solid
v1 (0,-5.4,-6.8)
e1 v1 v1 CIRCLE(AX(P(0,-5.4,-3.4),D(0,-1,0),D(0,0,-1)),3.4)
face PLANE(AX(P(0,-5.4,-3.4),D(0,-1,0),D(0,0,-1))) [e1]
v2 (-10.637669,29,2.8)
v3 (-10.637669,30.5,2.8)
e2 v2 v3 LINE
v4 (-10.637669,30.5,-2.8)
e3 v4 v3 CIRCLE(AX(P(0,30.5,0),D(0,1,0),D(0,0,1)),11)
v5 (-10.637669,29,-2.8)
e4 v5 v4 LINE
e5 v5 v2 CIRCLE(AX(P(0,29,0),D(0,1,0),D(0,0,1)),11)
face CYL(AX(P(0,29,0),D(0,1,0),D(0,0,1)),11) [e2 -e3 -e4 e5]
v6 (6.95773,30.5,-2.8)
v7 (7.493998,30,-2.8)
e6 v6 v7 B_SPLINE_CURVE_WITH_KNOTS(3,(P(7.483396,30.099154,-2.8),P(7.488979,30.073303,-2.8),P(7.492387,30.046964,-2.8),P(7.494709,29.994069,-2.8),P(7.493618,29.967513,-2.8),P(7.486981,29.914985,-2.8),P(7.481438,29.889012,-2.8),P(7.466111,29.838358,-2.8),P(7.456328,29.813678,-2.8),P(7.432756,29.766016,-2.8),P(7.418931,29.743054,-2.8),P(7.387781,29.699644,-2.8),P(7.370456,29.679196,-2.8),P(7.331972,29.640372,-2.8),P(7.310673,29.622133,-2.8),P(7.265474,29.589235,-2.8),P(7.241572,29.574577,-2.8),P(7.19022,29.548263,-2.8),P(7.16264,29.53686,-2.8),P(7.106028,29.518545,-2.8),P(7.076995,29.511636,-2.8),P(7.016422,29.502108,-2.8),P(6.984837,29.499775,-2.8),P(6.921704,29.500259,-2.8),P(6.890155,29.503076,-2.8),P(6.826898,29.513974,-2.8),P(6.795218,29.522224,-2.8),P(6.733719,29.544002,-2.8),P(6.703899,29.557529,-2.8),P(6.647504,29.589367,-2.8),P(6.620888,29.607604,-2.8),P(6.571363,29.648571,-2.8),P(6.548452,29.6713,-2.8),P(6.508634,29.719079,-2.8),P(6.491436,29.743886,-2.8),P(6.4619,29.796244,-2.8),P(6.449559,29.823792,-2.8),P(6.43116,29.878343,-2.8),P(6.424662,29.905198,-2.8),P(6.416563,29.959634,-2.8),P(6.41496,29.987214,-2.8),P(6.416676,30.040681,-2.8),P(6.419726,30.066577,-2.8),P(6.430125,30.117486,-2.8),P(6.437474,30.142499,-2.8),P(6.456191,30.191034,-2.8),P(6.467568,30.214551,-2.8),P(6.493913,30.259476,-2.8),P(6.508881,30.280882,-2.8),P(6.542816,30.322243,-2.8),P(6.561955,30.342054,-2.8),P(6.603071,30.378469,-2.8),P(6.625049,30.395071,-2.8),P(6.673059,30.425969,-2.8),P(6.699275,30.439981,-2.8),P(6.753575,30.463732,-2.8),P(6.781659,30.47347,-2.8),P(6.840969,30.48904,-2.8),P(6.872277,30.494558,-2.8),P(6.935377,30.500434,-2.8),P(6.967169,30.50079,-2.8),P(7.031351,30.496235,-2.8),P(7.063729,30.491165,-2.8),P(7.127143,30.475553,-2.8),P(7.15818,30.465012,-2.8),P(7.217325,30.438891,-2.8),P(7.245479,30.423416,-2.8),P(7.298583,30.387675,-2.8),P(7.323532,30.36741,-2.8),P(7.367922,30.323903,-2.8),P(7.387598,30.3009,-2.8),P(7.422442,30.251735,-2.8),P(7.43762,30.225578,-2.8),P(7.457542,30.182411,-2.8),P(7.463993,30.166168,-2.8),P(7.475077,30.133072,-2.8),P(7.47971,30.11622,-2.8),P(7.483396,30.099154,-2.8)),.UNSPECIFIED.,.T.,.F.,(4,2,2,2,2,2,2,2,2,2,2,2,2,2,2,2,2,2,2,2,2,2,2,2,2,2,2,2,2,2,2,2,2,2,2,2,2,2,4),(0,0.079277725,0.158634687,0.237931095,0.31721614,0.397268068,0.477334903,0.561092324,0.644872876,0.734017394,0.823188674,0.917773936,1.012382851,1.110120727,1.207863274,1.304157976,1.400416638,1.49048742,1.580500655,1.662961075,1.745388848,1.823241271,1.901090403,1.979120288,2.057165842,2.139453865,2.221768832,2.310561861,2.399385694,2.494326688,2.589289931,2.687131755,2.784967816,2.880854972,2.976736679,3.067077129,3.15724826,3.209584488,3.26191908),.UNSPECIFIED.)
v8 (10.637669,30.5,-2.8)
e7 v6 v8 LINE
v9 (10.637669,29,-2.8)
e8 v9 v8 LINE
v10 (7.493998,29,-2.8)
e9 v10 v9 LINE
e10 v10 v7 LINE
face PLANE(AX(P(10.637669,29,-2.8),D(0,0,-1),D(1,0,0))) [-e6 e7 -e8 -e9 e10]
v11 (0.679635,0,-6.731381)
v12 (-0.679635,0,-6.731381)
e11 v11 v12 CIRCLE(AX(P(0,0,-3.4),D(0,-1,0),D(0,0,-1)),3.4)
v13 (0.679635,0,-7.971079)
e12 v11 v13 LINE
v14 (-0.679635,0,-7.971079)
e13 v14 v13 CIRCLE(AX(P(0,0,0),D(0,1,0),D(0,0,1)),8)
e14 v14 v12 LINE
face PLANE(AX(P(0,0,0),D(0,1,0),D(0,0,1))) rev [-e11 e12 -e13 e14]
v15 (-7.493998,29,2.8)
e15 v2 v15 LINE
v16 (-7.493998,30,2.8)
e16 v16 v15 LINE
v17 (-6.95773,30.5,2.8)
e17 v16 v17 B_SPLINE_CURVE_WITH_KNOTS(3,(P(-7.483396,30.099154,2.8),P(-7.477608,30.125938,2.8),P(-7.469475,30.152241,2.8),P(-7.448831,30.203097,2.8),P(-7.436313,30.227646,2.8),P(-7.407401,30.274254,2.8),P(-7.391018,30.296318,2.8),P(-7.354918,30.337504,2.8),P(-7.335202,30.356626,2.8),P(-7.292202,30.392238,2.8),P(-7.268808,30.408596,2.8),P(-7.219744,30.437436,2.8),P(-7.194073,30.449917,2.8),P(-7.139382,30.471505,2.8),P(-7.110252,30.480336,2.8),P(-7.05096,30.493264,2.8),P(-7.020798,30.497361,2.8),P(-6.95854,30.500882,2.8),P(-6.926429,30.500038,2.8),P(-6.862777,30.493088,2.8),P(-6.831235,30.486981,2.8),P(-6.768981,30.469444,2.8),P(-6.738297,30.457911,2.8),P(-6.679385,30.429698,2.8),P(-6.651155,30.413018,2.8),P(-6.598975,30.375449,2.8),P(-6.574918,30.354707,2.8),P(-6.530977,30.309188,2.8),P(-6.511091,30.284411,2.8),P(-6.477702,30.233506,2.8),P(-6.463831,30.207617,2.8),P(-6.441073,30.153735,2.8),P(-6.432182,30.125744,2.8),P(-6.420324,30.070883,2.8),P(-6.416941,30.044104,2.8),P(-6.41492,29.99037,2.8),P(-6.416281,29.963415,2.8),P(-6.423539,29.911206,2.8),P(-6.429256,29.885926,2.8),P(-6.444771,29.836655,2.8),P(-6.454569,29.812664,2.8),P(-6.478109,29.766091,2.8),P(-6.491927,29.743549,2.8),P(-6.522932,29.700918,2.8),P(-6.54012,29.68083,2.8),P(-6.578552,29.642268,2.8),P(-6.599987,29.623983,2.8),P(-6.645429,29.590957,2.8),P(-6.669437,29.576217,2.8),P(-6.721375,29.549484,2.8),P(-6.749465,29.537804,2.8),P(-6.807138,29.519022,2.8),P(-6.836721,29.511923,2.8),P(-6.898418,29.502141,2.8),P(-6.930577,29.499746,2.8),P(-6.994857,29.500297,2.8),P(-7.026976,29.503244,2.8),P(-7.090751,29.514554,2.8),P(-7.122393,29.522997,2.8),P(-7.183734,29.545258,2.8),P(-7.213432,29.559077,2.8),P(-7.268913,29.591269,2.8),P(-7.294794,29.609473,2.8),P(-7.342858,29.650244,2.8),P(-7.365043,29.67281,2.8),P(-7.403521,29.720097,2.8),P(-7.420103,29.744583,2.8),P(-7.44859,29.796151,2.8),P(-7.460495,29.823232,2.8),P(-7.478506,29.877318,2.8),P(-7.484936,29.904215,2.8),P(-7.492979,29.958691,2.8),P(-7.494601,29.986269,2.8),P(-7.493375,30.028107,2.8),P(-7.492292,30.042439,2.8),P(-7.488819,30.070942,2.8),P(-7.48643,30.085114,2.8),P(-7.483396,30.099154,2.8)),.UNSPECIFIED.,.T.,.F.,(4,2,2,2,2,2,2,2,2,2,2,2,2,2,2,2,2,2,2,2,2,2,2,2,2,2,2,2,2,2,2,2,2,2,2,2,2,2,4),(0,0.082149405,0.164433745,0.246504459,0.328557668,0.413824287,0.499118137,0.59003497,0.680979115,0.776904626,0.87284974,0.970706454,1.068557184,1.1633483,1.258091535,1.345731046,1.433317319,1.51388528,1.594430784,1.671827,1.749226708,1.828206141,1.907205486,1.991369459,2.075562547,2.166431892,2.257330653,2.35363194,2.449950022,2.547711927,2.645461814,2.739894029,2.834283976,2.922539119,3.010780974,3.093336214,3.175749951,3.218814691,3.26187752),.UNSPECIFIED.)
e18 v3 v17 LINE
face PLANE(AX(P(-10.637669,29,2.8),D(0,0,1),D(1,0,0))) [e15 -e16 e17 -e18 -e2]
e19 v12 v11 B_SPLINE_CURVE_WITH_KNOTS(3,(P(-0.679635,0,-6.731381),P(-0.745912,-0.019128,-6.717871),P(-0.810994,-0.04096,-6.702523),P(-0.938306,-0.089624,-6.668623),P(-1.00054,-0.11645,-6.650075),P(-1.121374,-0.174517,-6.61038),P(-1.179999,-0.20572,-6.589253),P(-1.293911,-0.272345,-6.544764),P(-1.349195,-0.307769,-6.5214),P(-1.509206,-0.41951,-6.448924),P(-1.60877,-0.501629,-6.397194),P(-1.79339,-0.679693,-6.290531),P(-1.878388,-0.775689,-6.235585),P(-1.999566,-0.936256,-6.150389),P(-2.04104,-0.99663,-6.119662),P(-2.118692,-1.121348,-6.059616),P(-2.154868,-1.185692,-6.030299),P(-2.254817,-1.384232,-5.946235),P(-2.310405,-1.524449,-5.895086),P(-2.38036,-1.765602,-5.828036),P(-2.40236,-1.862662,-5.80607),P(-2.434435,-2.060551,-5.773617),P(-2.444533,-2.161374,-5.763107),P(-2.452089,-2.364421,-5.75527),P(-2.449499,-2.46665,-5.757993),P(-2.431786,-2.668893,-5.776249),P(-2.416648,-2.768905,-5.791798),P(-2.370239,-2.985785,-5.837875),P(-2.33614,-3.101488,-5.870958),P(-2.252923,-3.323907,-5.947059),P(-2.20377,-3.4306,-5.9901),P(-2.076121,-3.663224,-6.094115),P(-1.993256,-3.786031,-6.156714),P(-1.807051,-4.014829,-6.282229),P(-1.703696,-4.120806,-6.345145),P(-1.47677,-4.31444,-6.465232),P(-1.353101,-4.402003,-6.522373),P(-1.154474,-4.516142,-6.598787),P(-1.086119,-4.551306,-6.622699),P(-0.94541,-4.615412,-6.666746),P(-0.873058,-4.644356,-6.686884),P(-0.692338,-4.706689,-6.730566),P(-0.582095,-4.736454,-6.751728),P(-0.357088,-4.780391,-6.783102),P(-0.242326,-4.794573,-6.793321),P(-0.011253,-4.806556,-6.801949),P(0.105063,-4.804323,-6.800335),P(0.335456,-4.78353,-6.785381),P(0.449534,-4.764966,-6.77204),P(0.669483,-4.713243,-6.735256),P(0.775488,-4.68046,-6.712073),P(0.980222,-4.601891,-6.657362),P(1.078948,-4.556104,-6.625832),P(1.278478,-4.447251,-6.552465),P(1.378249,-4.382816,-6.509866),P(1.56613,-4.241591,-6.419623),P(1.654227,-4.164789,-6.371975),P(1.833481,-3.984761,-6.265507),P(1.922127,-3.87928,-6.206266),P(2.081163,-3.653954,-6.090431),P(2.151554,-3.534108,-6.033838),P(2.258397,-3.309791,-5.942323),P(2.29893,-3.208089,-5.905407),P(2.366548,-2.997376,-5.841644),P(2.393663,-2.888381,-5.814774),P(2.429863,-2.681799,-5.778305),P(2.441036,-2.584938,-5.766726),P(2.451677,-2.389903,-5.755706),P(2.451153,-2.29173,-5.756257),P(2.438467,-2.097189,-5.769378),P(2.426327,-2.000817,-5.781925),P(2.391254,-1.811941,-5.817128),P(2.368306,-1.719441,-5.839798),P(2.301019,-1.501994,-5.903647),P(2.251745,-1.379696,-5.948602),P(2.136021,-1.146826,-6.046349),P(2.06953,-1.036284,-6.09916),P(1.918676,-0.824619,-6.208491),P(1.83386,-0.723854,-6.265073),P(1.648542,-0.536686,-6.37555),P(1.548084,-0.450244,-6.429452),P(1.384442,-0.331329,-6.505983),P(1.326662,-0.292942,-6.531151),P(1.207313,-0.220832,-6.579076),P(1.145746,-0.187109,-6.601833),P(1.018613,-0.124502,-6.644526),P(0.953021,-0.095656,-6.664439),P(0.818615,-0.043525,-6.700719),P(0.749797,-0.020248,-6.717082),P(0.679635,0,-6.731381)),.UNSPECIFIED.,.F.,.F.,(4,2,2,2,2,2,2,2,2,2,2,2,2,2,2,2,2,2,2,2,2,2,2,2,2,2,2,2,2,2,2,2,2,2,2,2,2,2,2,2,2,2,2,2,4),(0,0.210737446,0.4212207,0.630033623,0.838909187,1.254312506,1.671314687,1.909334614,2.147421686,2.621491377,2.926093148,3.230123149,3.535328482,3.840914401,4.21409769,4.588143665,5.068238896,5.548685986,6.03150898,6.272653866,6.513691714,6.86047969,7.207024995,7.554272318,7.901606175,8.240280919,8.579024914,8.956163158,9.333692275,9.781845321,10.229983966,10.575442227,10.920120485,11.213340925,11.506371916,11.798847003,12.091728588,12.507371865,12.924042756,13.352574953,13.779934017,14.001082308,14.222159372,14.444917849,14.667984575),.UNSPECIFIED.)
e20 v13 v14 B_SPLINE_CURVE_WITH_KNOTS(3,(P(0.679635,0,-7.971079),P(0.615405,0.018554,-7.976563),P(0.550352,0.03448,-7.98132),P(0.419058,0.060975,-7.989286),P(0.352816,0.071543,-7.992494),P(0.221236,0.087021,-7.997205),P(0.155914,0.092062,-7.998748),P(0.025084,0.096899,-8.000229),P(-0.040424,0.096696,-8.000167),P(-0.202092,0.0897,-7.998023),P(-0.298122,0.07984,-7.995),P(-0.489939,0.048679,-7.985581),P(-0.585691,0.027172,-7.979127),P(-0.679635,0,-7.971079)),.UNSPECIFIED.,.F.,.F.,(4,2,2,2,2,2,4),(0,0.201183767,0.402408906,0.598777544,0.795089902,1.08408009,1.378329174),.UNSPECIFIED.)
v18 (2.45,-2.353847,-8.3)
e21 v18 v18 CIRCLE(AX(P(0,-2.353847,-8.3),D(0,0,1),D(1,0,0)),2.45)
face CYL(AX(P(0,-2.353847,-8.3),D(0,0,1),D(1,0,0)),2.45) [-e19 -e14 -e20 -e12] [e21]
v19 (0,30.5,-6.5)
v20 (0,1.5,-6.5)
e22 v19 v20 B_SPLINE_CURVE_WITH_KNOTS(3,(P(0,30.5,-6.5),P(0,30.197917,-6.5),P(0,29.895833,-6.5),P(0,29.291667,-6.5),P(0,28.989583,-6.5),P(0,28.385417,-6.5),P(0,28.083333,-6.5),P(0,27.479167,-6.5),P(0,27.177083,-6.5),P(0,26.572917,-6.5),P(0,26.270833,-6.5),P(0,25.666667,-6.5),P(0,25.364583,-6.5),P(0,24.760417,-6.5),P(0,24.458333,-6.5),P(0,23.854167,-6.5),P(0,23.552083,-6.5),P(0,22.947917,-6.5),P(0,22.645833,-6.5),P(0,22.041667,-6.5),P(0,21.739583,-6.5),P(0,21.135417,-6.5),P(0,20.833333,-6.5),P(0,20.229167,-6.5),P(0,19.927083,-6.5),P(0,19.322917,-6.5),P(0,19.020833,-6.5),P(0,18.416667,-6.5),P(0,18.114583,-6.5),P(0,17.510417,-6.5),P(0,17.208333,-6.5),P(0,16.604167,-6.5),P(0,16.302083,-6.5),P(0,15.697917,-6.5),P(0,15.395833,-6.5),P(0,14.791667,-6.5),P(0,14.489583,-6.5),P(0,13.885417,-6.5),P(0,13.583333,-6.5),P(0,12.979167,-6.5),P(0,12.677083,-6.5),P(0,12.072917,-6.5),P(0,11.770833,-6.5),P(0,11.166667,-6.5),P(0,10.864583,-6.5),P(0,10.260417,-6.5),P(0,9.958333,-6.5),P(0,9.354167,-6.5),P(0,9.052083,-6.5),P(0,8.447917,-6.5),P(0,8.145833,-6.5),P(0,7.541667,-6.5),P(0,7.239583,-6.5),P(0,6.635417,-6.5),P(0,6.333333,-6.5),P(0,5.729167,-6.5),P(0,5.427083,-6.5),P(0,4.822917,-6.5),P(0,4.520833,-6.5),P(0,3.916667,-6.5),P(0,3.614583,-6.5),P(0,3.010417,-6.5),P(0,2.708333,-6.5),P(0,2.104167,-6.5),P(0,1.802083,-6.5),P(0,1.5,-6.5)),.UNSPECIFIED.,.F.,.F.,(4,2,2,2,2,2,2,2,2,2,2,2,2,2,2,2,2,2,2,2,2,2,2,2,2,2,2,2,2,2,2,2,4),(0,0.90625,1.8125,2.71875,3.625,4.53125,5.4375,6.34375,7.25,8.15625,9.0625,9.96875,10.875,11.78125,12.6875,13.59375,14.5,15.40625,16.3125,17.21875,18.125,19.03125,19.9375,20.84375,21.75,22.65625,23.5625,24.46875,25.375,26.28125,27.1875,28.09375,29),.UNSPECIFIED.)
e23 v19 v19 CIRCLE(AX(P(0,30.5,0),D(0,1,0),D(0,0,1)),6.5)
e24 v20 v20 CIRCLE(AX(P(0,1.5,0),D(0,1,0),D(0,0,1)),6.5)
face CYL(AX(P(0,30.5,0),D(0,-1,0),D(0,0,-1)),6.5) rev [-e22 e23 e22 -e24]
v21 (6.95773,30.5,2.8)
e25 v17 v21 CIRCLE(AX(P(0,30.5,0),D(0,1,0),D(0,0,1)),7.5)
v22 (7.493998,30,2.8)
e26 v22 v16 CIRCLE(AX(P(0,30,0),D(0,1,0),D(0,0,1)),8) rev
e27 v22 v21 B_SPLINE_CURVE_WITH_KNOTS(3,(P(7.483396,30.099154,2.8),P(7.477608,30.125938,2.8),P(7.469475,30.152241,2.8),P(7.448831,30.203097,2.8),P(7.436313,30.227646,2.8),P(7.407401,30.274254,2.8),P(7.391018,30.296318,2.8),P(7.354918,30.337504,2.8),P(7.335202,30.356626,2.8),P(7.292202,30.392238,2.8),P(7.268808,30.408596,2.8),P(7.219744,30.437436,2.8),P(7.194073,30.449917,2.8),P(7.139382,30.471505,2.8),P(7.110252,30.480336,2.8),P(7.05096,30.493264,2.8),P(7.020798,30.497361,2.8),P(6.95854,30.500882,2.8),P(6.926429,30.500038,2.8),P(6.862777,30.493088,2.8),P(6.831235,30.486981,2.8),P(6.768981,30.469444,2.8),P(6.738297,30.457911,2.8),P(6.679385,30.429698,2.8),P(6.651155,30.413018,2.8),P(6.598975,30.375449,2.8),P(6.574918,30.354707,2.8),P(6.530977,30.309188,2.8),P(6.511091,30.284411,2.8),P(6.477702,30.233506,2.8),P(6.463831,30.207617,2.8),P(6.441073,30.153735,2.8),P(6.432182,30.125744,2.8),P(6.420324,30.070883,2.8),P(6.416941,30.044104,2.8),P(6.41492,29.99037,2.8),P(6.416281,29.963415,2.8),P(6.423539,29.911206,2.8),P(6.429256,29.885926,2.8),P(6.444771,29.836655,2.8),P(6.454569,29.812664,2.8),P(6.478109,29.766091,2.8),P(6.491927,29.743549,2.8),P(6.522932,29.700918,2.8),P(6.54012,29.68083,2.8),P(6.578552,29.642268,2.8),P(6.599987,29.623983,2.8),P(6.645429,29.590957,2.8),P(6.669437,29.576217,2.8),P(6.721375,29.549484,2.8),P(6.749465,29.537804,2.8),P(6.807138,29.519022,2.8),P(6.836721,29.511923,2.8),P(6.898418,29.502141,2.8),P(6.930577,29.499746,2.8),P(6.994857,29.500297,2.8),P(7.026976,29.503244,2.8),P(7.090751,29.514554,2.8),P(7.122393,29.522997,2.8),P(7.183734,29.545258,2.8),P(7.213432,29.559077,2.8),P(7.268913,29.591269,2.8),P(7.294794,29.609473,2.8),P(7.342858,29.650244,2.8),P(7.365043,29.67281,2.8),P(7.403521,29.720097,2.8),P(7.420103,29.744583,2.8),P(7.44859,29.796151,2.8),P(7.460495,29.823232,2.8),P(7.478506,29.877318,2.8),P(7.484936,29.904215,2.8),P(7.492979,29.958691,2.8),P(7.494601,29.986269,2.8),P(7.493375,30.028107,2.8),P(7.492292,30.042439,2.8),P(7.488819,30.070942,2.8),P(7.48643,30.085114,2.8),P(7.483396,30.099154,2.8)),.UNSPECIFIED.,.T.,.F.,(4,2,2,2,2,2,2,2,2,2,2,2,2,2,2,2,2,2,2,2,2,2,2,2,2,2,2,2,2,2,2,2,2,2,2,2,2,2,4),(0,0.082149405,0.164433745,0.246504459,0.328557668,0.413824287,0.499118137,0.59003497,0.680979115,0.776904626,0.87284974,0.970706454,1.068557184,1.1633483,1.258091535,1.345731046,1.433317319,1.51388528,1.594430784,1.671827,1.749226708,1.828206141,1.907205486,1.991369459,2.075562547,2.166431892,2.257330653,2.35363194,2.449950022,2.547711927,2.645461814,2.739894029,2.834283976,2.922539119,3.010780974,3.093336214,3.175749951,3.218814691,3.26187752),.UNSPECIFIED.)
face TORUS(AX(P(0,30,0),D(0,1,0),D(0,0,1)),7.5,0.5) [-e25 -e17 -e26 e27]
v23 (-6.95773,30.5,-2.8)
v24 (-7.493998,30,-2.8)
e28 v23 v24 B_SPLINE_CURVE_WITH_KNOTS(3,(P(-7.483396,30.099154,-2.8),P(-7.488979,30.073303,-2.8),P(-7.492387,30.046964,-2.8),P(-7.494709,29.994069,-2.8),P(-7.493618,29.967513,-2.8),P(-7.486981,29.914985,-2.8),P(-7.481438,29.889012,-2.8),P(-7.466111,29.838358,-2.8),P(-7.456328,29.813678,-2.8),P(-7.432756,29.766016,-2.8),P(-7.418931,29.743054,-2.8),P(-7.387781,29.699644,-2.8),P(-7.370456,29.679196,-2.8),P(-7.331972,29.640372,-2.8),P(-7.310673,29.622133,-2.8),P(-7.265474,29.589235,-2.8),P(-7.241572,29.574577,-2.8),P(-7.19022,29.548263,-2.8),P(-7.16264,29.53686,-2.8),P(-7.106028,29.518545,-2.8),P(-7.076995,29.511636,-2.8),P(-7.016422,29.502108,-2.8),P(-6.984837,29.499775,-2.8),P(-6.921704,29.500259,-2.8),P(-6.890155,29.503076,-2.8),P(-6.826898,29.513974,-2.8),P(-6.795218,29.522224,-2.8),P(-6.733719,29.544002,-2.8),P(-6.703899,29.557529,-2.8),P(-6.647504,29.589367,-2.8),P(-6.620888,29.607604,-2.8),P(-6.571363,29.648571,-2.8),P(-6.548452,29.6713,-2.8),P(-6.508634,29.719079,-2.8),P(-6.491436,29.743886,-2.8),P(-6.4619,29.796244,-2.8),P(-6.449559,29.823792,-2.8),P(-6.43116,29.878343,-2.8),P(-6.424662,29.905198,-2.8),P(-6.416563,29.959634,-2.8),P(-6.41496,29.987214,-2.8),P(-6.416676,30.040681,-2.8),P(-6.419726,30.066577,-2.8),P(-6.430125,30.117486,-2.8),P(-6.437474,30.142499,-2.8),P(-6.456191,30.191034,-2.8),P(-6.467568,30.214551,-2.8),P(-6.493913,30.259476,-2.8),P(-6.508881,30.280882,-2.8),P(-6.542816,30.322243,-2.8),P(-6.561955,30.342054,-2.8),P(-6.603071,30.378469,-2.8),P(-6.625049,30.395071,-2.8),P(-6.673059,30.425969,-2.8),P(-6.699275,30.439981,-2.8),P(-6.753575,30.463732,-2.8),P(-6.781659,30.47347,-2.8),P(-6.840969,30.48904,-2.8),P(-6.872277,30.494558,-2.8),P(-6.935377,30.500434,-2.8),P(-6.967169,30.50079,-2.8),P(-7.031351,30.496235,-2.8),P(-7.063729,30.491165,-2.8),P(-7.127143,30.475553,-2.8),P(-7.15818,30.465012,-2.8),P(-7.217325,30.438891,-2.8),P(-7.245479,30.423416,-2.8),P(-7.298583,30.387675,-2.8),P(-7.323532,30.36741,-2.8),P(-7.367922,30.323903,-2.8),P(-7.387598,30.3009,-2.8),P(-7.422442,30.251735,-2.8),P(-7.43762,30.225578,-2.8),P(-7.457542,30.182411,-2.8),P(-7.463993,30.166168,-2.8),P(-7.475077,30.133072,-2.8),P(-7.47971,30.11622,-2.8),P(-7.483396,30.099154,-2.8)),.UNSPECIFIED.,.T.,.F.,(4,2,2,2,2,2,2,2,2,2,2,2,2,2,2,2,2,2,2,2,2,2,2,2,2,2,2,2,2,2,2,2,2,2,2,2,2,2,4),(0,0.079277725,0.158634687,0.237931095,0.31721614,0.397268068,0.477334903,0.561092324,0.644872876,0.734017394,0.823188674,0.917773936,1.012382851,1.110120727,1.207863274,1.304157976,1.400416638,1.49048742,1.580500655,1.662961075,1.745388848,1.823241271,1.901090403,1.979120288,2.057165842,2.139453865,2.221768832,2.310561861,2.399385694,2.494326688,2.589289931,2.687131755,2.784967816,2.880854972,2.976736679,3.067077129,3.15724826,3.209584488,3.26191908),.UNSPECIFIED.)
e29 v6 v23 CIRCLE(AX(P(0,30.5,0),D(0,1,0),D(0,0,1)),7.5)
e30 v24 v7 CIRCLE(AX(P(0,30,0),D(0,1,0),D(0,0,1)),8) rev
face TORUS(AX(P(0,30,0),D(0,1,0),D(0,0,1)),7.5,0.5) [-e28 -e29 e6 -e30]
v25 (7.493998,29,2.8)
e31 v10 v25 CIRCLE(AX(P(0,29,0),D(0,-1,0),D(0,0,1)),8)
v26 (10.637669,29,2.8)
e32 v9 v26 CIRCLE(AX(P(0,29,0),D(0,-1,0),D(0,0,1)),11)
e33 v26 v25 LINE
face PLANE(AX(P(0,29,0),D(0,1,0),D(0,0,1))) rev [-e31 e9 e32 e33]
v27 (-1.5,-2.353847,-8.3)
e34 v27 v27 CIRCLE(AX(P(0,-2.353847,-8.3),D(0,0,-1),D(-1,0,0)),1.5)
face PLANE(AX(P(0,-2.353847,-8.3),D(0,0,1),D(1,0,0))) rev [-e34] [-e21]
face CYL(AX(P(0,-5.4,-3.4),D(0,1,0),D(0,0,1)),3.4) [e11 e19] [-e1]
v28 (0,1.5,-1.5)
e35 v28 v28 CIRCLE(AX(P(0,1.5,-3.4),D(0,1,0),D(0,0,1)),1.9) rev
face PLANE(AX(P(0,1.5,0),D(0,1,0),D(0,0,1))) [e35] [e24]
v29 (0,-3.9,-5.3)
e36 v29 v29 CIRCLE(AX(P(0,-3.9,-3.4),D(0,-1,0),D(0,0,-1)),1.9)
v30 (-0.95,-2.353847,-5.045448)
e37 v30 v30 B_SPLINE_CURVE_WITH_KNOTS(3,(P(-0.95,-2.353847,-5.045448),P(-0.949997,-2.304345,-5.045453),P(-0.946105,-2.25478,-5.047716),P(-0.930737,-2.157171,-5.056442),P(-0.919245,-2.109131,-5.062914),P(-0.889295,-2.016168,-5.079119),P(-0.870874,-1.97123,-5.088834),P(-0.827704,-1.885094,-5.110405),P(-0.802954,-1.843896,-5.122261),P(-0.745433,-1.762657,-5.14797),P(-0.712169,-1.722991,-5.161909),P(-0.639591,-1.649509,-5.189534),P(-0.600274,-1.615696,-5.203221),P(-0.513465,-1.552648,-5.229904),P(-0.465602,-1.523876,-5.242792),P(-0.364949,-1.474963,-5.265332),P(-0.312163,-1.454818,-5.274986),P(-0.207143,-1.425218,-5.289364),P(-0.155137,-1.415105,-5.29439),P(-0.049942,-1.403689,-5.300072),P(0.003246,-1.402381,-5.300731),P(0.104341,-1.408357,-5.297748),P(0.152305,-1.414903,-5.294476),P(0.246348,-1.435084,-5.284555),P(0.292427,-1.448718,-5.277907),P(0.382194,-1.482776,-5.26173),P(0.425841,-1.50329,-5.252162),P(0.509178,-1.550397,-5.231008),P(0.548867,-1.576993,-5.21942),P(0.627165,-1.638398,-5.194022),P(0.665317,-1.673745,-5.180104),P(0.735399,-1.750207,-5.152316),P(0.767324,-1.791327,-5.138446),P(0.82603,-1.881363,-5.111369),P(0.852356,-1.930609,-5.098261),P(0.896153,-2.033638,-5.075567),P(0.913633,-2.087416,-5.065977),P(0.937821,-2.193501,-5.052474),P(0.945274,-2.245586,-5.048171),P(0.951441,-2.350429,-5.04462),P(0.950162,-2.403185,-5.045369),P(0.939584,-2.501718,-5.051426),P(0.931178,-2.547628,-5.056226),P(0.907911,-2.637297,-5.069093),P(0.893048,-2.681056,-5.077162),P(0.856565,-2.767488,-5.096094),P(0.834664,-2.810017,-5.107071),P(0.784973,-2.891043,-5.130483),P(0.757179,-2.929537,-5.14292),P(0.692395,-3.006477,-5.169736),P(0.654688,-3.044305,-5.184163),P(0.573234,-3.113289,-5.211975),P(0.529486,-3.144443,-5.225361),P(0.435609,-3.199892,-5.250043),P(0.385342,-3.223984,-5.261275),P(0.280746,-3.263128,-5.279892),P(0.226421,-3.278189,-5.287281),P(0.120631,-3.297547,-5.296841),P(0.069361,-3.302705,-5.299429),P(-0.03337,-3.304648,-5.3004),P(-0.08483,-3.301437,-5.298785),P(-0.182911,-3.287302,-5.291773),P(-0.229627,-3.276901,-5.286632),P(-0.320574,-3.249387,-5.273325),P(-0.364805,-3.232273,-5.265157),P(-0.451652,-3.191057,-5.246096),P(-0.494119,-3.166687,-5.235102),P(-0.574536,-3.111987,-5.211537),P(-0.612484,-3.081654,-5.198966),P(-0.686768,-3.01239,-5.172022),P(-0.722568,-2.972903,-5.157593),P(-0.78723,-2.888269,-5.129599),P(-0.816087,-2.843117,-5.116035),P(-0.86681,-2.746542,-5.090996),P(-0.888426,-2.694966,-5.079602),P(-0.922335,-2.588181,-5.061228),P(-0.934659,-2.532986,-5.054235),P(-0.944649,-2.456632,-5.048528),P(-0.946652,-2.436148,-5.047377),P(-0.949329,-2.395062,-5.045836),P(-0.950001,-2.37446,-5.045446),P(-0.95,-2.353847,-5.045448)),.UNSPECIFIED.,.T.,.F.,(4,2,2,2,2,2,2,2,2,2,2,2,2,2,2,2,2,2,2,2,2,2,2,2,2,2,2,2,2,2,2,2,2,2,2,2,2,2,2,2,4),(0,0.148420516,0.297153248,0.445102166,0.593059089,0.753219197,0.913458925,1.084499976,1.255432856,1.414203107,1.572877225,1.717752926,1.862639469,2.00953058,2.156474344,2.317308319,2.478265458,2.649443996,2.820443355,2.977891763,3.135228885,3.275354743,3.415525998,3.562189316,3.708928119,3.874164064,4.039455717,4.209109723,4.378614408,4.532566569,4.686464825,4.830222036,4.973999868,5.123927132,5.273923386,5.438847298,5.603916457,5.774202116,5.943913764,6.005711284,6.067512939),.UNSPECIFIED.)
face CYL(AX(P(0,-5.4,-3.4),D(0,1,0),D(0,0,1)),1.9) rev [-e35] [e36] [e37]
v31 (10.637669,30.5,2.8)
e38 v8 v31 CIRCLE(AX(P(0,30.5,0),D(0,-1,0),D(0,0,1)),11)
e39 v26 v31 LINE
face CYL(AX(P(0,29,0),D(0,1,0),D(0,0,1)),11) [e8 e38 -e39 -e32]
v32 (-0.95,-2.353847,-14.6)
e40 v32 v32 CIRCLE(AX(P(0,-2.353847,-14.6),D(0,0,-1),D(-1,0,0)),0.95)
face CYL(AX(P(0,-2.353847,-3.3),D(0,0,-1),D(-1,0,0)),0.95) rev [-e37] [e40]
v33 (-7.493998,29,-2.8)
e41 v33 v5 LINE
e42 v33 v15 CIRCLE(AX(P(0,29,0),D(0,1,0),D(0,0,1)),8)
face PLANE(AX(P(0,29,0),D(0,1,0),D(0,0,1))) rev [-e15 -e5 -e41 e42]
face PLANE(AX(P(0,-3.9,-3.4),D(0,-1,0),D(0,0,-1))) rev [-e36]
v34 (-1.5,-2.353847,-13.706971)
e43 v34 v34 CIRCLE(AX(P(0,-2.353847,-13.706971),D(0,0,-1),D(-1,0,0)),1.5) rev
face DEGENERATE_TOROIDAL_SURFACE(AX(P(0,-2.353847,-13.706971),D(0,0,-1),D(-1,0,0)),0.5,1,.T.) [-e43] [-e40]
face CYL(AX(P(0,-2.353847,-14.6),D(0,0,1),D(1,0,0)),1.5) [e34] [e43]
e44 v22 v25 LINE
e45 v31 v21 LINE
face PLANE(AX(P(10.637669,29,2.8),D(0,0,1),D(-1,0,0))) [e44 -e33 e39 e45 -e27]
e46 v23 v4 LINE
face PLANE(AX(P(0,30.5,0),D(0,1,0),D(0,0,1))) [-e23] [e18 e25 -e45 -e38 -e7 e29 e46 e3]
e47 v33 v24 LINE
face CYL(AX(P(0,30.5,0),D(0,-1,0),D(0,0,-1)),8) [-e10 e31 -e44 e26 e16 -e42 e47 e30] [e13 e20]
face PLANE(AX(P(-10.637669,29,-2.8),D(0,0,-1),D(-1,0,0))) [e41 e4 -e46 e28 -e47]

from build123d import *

# Parameters (mm, degrees)
SKETCH1_R           = 8
BOSS_EXTRUDE1_DEPTH = 30.5
SHELL1_T            = -1.5
SKETCH2_R           = 3.4
BOSS_EXTRUDE2_DEPTH = 5.4
SHELL2_START        = -3.9
SHELL2_OUTLINE_R    = 1.9
SHELL2_DEPTH        = 5.4
SKETCH5_R           = 2.45
BOSS_EXTRUDE5_DEPTH = 4.9
SKETCH6_R           = 1.5
BOSS_EXTRUDE6_DEPTH = 6.3
SKETCH7_R           = 0.95
CUT_EXTRUDE1_DEPTH  = 11.3
SKETCH8_R           = 1.9
CUT_EXTRUDE2_DEPTH  = 39.216750365
FILLET1_R           = 1
FILLET2_R           = 0.5
BOSS_EXTRUDE7_START = -1.5
BOSS_EXTRUDE7_DEPTH = 1.5


# Read off the part's stored shape, not the designer's step: Shell2
with BuildPart() as part:
    # Sketch1 → Boss-Extrude1 (new body)
    with BuildSketch(Plane(origin=(0, 0, 0), x_dir=(1, 0, 0), z_dir=(0, 1, 0))):
        with Locations(Location((0, 0, 0), (0, 0, 90))):
            Circle(SKETCH1_R)
    extrude(amount=BOSS_EXTRUDE1_DEPTH)

    # Shell1
    shell1_openings = [part.faces().sort_by_distance(p)[0] for p in [
        (0, 30.5, 0),
    ]]
    offset(amount=SHELL1_T, openings=shell1_openings, kind=Kind.INTERSECTION)

    # Sketch2 → Boss-Extrude2 (add)
    with BuildSketch(Plane.XZ):
        with Locations(Location((0, -3.4, 0), (0, 0, 90))):
            Circle(SKETCH2_R)
    extrude(amount=BOSS_EXTRUDE2_DEPTH)

    # Shell2 outline → Shell2 (cut)
    with BuildSketch(Plane(origin=(0, 0, 0), x_dir=(1, 0, 0), z_dir=(0, 1, 0)).offset(SHELL2_START)):
        with Locations((0, 3.4)):
            Circle(SHELL2_OUTLINE_R)
    extrude(amount=SHELL2_DEPTH, mode=Mode.SUBTRACT)

    # Sketch5 → Boss-Extrude5 (add)
    with BuildSketch(Plane.XY.offset(-3.4)):
        with Locations((0, -2.35384725)):
            Circle(SKETCH5_R)
    extrude(amount=-BOSS_EXTRUDE5_DEPTH)

    # Sketch6 → Boss-Extrude6 (add)
    with BuildSketch(Plane(origin=(0, 0, -8.3), x_dir=(-1, 0, 0), z_dir=(0, 0, -1))):
        with Locations((0, -2.35384725)):
            Circle(SKETCH6_R)
    extrude(amount=BOSS_EXTRUDE6_DEPTH)

    # Sketch7 → Cut-Extrude1 (cut)
    with BuildSketch(Plane(origin=(0, 0, -14.6), x_dir=(-1, 0, 0), z_dir=(0, 0, -1))):
        with Locations((0, -2.35384725)):
            Circle(SKETCH7_R)
    extrude(amount=-CUT_EXTRUDE1_DEPTH, mode=Mode.SUBTRACT)

    # Sketch8 → Cut-Extrude2 (cut, through all)
    with BuildSketch(Plane(origin=(0, -3.9, 0), x_dir=(1, 0, 0), z_dir=(0, 1, 0))):
        with Locations(Location((0, 3.4, 0), (0, 0, 270))):
            Circle(SKETCH8_R)
    extrude(amount=CUT_EXTRUDE2_DEPTH, mode=Mode.SUBTRACT)

    # Fillet1
    # the kernel refuses this fillet: 1 mm, written as the material it takes off along each edge
    with BuildSketch(Plane(origin=(0, -2.35384725, -14.6), x_dir=(-1, 0, 0), z_dir=(0, -1, 0))) as fillet1_piece_1:
        with BuildLine():
            CenterArc((0.5, -0.893028555), FILLET1_R, 0, 63.25631605)
            Line((1.5, -0.893028555), (1.52, -0.893028555))
            Line((1.52, -0.893028555), (1.52, 0))
            Line((1.52, 0), (1.5, 0.02))
            ThreePointArc((1.5, 0.02), (1.225, 0.02), (0.959, 0.017860571))
            Line((0.959, 0.017860571), (0.95, 0))
        make_face()
    revolve(axis=Axis((0, -2.35384725, -14.6), (0, 0, -1)), mode=Mode.SUBTRACT)

    # Fillet2
    fillet2_edges = [part.edges().sort_by_distance(p)[0] for p in [
        (0, 30.5, 8),
    ]]
    fillet(fillet2_edges, radius=FILLET2_R)

    # Sketch9 → Boss-Extrude7 (add)
    with BuildSketch(Plane(origin=(0, 30.5, 0), x_dir=(1, 0, 0), z_dir=(0, 1, 0)).offset(BOSS_EXTRUDE7_START)):
        with BuildLine():
            Line((-10.637668918, 2.8), (-5.86600375, 2.8))
            ThreePointArc((-5.86600375, 2.8), (-6.5, 0), (-5.86600375, -2.8))
            Line((-5.86600375, -2.8), (-10.637668918, -2.8))
            ThreePointArc((-10.637668918, -2.8), (-11, 0), (-10.637668918, 2.8))
        make_face()
    extrude(amount=BOSS_EXTRUDE7_DEPTH)

    # Mirror1: part across plane


with BuildPart() as part_1:
    add(part.part)
    add(part.part.mirror(Plane(origin=(0, 0, 0), x_dir=(0, 0, 1), z_dir=(1, 0, 0))))


solid = part_1.part
